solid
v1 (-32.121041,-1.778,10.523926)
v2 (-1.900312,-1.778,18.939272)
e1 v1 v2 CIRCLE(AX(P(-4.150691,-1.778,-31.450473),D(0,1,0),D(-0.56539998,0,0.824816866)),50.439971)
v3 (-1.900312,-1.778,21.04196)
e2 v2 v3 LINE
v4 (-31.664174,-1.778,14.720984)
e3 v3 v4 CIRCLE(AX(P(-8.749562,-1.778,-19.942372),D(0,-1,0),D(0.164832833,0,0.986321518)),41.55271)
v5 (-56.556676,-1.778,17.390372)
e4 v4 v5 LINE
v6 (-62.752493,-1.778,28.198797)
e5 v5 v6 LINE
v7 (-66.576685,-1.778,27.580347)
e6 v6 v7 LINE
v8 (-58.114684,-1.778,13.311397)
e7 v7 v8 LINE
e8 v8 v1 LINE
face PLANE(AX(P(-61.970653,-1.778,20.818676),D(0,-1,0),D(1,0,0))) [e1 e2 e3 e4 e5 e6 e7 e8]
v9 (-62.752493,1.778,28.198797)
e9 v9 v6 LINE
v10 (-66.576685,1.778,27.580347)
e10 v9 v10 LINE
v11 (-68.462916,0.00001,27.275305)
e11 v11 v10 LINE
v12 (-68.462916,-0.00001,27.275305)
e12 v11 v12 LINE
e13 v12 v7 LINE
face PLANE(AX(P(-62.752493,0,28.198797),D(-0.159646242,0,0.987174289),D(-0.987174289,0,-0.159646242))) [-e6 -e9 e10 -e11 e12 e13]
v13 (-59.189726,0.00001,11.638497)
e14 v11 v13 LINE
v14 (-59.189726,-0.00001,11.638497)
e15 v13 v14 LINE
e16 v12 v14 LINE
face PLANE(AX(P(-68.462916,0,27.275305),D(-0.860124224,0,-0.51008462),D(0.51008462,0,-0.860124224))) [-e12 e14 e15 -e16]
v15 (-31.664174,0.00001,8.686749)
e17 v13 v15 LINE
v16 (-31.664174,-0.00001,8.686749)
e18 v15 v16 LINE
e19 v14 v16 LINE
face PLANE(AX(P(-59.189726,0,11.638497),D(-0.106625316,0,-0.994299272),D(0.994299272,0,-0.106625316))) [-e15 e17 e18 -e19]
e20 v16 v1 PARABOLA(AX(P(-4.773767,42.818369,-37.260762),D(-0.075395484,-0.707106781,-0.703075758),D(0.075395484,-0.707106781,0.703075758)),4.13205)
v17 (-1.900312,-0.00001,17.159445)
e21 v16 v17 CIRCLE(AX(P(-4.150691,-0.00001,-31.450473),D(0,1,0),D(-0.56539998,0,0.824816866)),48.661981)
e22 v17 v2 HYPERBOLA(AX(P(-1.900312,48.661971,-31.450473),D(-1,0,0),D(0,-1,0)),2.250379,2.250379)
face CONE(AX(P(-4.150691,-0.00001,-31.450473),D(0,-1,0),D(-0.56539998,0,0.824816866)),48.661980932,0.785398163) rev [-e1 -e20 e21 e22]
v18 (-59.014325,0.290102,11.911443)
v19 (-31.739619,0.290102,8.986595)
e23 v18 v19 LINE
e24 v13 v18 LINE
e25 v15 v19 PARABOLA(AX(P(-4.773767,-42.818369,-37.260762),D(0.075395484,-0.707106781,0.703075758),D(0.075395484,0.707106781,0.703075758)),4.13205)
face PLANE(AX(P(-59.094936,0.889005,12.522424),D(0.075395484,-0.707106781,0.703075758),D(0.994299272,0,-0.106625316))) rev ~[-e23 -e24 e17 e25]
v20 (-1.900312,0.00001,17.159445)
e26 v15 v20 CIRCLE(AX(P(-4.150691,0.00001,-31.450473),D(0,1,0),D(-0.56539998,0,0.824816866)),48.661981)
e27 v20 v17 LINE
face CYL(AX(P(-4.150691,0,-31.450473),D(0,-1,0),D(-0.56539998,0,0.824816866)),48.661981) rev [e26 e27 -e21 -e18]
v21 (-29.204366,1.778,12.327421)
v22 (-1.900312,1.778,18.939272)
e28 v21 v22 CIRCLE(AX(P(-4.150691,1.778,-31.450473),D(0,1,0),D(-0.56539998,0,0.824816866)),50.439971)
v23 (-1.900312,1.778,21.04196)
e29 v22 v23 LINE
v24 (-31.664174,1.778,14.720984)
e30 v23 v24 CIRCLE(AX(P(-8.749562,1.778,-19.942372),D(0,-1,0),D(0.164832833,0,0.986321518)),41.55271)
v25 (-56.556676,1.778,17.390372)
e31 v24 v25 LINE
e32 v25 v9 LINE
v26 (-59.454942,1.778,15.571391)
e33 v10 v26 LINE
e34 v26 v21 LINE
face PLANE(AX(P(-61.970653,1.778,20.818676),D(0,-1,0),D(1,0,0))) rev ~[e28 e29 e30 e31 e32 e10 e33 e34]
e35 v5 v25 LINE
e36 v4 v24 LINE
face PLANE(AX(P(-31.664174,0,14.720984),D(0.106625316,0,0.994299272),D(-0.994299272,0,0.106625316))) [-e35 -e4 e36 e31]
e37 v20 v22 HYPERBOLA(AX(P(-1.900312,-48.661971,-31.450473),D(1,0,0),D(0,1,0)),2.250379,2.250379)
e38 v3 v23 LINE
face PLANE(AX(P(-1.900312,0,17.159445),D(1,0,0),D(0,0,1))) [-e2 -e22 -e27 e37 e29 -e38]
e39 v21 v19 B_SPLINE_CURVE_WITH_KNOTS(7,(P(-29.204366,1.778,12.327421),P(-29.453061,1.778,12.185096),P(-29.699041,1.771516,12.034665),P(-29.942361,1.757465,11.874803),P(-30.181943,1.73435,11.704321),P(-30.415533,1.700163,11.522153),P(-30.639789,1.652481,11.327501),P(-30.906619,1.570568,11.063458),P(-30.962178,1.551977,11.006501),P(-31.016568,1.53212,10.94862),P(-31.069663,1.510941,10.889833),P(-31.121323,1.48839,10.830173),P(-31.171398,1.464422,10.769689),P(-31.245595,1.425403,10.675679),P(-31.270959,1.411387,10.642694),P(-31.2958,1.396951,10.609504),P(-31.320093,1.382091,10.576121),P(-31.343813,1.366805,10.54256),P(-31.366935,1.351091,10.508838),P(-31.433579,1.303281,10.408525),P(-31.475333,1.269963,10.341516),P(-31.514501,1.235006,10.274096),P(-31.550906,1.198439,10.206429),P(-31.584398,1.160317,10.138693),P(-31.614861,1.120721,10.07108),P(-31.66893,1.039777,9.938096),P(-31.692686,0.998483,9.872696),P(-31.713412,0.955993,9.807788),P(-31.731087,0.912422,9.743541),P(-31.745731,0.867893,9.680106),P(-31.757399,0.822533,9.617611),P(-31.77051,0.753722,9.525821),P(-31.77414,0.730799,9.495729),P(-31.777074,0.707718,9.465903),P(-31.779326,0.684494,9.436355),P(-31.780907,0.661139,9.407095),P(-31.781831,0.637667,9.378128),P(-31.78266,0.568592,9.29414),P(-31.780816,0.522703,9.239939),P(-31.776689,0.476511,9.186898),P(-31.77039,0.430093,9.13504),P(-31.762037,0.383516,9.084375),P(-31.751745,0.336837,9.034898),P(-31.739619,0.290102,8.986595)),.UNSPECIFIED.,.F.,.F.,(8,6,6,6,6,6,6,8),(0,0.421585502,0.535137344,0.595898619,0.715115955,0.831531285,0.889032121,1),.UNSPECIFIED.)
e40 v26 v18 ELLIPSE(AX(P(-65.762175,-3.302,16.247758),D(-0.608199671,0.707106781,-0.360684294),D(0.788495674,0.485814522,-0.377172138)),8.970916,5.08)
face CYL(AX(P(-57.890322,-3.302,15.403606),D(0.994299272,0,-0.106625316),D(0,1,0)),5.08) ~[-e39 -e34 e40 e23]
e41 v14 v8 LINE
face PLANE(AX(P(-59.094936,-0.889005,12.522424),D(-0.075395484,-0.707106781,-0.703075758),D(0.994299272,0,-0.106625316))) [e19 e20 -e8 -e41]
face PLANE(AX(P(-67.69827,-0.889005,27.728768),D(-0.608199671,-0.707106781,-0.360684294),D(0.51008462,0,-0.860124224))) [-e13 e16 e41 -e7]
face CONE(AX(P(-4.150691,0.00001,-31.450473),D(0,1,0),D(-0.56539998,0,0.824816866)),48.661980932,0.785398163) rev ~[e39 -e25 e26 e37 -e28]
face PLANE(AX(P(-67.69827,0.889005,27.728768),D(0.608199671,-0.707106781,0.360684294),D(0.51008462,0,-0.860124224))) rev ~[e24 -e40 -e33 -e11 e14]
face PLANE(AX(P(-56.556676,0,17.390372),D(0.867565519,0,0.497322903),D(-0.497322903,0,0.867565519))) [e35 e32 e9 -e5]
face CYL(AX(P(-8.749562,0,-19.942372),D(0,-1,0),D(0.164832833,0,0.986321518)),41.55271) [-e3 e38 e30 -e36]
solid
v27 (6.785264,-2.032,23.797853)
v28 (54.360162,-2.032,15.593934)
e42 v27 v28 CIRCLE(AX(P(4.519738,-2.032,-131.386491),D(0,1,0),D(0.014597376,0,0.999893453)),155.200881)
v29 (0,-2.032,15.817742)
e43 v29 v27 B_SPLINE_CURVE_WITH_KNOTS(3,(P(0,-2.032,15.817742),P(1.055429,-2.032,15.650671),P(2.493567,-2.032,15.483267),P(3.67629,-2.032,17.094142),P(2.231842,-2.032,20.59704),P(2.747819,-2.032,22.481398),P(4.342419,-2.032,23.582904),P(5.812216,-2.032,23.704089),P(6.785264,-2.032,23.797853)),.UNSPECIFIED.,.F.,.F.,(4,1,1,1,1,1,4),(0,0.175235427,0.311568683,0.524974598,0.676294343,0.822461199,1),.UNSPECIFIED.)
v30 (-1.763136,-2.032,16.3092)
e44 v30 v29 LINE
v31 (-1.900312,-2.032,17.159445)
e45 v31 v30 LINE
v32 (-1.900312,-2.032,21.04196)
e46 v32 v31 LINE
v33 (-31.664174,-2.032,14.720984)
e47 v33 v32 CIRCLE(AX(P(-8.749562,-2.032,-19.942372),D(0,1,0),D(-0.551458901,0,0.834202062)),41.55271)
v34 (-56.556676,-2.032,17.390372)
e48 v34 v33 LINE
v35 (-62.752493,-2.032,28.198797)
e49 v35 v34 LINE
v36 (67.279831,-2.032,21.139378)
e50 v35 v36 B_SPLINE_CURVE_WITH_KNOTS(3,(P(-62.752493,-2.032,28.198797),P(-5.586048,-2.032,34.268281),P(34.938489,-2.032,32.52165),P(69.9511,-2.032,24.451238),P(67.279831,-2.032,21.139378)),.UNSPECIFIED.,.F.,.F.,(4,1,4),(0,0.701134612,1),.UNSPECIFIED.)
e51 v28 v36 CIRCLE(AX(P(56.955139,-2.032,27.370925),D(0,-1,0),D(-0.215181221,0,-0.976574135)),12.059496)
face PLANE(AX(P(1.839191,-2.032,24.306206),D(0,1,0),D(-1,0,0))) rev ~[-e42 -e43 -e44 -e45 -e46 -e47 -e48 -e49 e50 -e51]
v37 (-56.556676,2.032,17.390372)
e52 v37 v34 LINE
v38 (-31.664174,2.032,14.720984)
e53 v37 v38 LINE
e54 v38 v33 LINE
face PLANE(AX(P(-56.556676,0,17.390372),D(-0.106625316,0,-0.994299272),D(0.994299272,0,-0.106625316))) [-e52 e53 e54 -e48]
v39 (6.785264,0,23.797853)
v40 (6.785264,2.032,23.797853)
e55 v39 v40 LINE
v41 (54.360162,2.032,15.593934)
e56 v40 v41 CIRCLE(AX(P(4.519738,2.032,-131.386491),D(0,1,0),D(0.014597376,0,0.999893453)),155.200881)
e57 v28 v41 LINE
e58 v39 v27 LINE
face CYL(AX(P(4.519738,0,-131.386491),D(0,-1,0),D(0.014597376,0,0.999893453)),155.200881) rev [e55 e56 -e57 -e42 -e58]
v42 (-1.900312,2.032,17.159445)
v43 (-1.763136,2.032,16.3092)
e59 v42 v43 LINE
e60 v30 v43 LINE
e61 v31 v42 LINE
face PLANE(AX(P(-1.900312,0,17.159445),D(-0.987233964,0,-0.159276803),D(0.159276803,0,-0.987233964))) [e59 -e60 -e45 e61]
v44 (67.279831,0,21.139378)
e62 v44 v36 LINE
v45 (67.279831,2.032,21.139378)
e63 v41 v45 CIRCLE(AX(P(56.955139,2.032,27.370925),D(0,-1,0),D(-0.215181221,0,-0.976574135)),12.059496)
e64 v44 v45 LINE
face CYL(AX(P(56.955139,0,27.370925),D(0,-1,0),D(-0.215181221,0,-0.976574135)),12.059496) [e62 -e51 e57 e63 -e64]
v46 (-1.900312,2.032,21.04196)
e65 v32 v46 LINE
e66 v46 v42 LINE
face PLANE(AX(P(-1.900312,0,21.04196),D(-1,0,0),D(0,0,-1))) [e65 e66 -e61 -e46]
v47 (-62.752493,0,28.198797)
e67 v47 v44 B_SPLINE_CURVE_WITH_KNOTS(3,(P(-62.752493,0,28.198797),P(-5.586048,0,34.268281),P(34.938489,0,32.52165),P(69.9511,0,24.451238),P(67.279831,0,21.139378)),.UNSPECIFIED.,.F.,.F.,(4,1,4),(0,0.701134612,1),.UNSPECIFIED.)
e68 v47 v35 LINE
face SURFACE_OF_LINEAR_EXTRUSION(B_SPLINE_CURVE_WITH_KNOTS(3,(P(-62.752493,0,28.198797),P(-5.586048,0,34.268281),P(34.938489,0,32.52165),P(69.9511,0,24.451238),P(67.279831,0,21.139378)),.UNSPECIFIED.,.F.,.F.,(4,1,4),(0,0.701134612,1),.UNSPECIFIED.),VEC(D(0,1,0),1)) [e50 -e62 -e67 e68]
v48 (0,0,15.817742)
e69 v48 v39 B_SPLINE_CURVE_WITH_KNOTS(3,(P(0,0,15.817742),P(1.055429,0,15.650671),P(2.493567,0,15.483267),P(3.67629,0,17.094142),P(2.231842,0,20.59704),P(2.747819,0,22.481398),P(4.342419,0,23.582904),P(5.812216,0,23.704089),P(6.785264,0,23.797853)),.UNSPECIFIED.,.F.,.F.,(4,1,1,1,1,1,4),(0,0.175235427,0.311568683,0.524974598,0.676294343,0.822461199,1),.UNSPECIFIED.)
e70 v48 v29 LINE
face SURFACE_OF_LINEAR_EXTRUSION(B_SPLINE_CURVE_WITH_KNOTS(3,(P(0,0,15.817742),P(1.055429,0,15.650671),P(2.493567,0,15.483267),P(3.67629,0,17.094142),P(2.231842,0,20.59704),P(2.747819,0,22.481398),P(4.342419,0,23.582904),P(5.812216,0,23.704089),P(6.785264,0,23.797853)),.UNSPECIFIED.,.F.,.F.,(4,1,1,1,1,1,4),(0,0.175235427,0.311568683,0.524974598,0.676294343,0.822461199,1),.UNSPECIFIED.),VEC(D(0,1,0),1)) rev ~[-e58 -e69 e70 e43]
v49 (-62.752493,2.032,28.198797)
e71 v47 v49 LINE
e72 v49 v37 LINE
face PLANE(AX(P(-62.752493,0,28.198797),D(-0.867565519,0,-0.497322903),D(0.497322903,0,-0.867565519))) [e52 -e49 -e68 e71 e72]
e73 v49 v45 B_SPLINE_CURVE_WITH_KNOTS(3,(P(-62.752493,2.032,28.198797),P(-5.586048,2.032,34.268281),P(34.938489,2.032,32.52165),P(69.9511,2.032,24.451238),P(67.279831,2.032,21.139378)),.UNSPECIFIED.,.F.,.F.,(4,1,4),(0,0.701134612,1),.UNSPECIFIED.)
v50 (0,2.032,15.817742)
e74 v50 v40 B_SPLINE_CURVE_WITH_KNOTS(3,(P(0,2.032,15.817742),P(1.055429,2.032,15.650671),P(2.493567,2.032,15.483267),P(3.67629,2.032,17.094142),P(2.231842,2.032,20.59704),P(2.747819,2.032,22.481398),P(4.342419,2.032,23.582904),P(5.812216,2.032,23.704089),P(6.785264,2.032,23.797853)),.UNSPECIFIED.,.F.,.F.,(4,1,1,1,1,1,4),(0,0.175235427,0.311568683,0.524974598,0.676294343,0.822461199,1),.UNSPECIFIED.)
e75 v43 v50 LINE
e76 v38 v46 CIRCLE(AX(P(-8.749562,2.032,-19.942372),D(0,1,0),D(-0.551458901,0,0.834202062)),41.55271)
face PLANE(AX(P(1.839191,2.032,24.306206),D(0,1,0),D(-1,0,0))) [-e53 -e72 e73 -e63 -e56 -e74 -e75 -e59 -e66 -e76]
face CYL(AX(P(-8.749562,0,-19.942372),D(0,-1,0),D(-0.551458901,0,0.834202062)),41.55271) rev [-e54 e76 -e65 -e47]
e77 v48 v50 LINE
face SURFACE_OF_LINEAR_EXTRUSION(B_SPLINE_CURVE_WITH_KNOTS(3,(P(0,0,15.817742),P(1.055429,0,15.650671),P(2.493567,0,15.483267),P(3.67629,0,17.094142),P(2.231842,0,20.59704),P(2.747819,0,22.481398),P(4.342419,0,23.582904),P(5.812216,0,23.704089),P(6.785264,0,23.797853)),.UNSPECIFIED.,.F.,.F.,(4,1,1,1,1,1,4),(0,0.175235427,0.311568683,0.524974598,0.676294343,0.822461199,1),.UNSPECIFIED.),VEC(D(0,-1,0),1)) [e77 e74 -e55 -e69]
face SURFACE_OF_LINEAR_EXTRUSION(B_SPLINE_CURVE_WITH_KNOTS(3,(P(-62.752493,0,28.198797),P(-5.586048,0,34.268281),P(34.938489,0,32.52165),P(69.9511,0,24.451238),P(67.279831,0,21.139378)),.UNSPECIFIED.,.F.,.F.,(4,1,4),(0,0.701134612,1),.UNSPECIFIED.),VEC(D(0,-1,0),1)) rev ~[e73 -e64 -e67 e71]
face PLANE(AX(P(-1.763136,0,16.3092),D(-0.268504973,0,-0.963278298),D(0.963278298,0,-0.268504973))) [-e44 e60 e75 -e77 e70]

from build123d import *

# Parameters (mm, degrees)
F1_DEPTH = 2.032
F2_DEPTH = 1.778
F3_SIZE  = 1.77799
F4_R     = 5.08


# Not quite as in the source:
# - a fillet or chamfer is up to 0.001 mm smaller than in the source, because OpenCascade refuses the exact size


with BuildPart() as f1:
    # F0 (on Front) → F1 (new body, symmetric)
    with BuildSketch(Plane.XZ):
        with BuildLine():
            add(Edge.make_bspline(
                [(-62.7524927258, 28.1987972558), (-5.5860476855, 34.2682807977), (34.9384894232, 32.5216500899), (69.9510998155, 24.4512375904), (67.279830575, 21.1393777281)],
                knots=[0, 0, 0, 0, 0.7011346116, 1, 1, 1, 1], degree=3))
            Line((-62.7524927258, 28.1987972558), (-56.5566755831, 17.3903722316))
            Line((-56.5566755831, 17.3903722316), (-31.6641740501, 14.7209839443))
            ThreePointArc((-31.6641740501, 14.7209839443), (-17.3816327548, 20.703845911), (-1.9003116759, 21.0419595242))
            Line((-1.9003116759, 21.0419595242), (-1.9003116759, 17.1594452113))
            Line((-1.9003116759, 17.1594452113), (-1.7631361261, 16.3091998547))
            Line((-1.7631361261, 16.3091998547), (0, 15.8177418634))
            add(Edge.make_bspline(
                [(0, 15.8177418634), (1.0554286018, 15.6506710745), (2.4935673391, 15.483267377), (3.6762898855, 17.0941419119), (2.2318424188, 20.5970397753), (2.747819389, 22.4813980256), (4.3424194487, 23.5829041278), (5.8122159988, 23.7040893948), (6.7852635402, 23.7978529185)],
                knots=[0, 0, 0, 0, 0.1752354273, 0.3115686834, 0.5249745977, 0.6762943435, 0.8224611993, 1, 1, 1, 1], degree=3))
            ThreePointArc((6.7852635402, 23.7978529185), (30.8936565264, 21.5570594528), (54.3601624668, 15.5939338729))
            ThreePointArc((54.3601624668, 15.5939338729), (61.7117251, 16.2891237606), (67.279830575, 21.1393777281))
        make_face()
    extrude(amount=F1_DEPTH, both=True)


with BuildPart() as f2:
    # F0 (on Front) → F2 (new body, symmetric)
    with BuildSketch(Plane.XZ):
        Polygon((-56.5566755831, 17.3903722316), (-62.7524927258, 28.1987972558), (-68.4629157186, 27.2753052413), (-59.1897256672, 11.6384970024), align=None)
        Polygon((-31.6641740501, 14.7209839443), (-56.5566755831, 17.3903722316), (-59.1897256672, 11.6384970024), (-31.6641740501, 8.6867492646), align=None)
        with BuildLine():
            ThreePointArc((-1.9003116759, 21.0419595242), (-17.3816327548, 20.703845911), (-31.6641740501, 14.7209839443))
            Line((-31.6641740501, 14.7209839443), (-31.6641740501, 8.6867492646))
            ThreePointArc((-31.6641740501, 8.6867492646), (-17.4737066723, 15.3521509637), (-1.9003116759, 17.1594452113))
            Line((-1.9003116759, 17.1594452113), (-1.9003116759, 21.0419595242))
        make_face()
    extrude(amount=F2_DEPTH, both=True)

    # F3 (size 1.778 in the source; OpenCascade refuses exactly that, so slightly less here)
    f3_edges = [f2.edges().sort_by_distance(p)[0] for p in [
        (-17.473707, -1.778, 15.352151),
        (-17.473707, 1.778, 15.352151),
        (-45.42695, -1.778, 10.162623),
        (-45.42695, 1.778, 10.162623),
        (-63.826321, -1.778, 19.456901),
        (-63.826321, 1.778, 19.456901),
    ]]
    chamfer(f3_edges, length=F3_SIZE)

    # F4
    f4_edges = [f2.edges().sort_by_distance(p)[0] for p in [
        (-45.117862, 1.778, 11.917662),
    ]]
    fillet(f4_edges, radius=F4_R)


solid = Compound([f1.part, f2.part])
